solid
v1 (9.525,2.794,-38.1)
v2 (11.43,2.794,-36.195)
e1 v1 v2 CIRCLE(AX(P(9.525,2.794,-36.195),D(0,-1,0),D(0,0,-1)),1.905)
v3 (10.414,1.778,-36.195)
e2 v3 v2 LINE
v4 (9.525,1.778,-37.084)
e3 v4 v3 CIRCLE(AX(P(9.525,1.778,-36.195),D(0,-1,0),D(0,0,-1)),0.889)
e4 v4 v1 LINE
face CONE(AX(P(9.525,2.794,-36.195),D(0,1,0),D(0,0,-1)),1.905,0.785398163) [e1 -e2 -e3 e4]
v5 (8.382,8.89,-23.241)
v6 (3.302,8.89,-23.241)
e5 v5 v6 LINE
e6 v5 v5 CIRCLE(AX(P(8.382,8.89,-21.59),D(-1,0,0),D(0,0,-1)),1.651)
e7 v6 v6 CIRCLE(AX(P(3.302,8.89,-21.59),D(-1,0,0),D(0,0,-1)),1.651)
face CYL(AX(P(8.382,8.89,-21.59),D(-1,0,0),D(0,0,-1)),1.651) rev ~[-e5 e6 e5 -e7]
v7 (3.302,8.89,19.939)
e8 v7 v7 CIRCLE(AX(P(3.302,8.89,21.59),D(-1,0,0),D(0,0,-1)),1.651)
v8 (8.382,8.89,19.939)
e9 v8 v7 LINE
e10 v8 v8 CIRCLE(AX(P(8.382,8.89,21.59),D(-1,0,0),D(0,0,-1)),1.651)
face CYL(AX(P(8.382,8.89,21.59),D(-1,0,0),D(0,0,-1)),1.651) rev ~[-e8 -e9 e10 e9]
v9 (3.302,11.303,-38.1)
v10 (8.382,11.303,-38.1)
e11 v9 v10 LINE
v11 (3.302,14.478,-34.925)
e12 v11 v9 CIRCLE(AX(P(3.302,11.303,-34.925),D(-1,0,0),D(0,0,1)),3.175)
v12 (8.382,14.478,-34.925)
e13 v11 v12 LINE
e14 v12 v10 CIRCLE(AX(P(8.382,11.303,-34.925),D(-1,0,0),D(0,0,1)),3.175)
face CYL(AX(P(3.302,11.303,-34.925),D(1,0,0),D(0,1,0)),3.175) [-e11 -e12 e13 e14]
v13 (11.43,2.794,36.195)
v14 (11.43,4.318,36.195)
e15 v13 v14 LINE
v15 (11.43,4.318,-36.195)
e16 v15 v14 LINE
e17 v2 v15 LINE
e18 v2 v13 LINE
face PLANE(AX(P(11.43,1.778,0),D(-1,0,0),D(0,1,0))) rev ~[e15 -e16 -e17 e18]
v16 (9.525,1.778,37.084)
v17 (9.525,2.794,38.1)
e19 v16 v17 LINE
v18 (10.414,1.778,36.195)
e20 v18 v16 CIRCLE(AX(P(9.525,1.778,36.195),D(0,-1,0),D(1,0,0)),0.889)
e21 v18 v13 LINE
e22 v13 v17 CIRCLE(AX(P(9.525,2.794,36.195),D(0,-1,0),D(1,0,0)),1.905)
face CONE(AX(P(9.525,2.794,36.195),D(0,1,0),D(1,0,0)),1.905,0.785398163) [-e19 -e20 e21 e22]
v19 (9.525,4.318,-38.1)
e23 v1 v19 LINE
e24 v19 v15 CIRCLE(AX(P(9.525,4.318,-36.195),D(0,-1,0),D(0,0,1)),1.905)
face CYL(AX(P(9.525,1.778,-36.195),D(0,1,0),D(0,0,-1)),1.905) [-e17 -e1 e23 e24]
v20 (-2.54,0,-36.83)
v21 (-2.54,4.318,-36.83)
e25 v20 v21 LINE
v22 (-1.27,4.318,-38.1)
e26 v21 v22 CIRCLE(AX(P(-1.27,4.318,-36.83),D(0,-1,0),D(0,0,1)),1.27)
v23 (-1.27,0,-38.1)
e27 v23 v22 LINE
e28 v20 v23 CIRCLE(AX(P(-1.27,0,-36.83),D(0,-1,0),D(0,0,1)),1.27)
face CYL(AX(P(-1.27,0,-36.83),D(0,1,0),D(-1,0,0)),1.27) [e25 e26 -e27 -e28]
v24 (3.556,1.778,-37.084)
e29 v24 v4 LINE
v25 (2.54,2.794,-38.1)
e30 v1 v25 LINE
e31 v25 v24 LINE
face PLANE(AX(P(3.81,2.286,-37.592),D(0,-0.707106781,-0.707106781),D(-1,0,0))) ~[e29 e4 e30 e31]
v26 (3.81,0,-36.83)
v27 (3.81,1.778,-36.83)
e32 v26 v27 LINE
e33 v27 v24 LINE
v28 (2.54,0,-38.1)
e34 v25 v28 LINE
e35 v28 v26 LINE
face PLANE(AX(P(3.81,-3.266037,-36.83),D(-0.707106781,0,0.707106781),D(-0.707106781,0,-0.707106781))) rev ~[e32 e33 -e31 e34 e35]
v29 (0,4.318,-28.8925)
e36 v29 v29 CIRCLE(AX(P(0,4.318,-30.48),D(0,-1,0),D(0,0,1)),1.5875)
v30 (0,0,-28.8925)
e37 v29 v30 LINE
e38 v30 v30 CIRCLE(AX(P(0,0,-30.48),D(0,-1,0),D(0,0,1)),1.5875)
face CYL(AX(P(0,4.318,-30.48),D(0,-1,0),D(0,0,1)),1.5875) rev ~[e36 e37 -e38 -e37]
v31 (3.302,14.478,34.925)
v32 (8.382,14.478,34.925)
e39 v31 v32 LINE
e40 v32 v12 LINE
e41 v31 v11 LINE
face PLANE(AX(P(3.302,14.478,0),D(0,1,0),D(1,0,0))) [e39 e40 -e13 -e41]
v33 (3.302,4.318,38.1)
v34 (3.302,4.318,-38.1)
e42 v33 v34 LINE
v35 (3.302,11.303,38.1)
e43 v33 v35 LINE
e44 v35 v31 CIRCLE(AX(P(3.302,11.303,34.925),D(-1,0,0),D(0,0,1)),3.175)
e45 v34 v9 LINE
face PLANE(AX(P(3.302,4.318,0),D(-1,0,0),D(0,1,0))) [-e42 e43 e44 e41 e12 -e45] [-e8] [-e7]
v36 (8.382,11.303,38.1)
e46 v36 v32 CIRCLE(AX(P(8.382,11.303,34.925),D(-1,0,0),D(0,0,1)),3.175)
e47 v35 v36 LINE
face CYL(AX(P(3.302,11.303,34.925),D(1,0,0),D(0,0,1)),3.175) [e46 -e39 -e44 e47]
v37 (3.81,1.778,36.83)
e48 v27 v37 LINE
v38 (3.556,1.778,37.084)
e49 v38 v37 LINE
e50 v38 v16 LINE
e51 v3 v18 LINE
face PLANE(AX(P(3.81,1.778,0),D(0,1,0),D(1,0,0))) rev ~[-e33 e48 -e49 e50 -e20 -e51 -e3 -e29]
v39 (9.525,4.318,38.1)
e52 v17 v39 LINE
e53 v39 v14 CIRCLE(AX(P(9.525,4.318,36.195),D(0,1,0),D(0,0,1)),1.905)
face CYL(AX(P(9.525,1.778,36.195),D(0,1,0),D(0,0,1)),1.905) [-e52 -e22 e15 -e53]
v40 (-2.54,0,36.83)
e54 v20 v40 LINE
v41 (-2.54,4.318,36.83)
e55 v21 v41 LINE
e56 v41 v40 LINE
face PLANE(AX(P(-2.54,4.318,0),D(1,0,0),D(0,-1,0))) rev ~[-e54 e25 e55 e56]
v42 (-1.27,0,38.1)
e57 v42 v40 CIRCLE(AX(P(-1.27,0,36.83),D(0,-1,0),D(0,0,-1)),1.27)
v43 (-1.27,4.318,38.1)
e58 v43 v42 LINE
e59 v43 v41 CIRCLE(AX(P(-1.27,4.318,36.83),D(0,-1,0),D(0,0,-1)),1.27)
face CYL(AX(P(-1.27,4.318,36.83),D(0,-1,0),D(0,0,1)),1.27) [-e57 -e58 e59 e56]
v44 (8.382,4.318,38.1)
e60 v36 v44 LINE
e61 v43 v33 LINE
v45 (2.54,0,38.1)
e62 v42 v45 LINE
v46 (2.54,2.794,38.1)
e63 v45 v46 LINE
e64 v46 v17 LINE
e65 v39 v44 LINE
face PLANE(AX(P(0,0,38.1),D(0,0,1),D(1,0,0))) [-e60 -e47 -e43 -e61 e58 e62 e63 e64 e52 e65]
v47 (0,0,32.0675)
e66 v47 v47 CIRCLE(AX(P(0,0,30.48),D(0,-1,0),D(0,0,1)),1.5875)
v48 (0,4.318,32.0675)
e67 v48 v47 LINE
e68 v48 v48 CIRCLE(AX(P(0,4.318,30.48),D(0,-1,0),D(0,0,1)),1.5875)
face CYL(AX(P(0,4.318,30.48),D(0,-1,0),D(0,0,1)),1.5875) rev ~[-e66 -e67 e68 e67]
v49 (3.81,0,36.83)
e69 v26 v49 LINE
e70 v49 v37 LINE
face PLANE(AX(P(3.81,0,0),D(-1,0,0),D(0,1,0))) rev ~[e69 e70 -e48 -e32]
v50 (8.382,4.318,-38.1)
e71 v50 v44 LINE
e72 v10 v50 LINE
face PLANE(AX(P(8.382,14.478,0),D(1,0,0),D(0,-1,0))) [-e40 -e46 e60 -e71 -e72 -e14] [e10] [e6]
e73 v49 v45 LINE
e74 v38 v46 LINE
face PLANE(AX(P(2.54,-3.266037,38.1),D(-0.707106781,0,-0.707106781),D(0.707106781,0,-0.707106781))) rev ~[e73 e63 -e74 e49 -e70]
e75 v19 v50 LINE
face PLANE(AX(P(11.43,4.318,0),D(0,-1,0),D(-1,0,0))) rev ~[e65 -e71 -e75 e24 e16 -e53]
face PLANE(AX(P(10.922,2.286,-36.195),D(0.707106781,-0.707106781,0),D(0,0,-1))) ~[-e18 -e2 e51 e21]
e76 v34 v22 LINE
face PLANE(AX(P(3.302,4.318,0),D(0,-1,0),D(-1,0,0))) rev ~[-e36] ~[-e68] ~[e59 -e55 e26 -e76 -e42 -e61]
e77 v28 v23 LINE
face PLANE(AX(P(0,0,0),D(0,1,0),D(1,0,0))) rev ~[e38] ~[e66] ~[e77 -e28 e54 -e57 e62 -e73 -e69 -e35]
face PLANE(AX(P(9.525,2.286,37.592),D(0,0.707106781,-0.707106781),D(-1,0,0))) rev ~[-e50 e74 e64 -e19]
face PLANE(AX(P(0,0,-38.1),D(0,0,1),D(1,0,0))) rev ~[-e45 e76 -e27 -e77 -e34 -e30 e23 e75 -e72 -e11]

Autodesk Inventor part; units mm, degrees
ref_plane "YZ Plane" through (0, 0, 0) normal (1, 0, 0) x (0, 1, 0)
ref_plane "XZ Plane" through (0, 0, 0) normal (0, 1, 0) x (-1, 0, 0)
ref_plane "XY Plane" through (0, 0, 0) normal (0, 0, 1) x (1, 0, 0)
sketch "Sketch1" plane through (0, 0, 0) normal (0, 0, 1) x (1, 0, 0)
  line L0 (0, 17.3736) -> (0, -2.8956) projected
  line L1 (-5.334, 0) -> (14.224, 0) projected
  line L2 (3.81, 1.778) -> (-2.54, 1.778)
  line L3 (-2.54, 1.778) -> (-2.54, 0)
  line L4 (-2.54, 0) -> (3.81, 0)
  line L5 (3.81, 0) -> (3.81, 1.778)
  line L6 (3.81, 1.778) -> (11.43, 1.778)
  line L7 (11.43, 1.778) -> (11.43, 4.318)
  line L8 (11.43, 4.318) -> (-2.54, 4.318)
  line L9 (-2.54, 4.318) -> (-2.54, 1.778)
  line L10 (8.382, 4.318) -> (3.302, 4.318)
  line L11 (3.302, 4.318) -> (3.302, 14.478)
  line L12 (3.302, 14.478) -> (8.382, 14.478)
  line L13 (8.382, 14.478) -> (8.382, 4.318)
  point P0 (0, 0)
  point P1 (0, 0.635)
  dimension "d1" = 2.54
  dimension "d2" = 1.778
  dimension "d25" = 2.54
  dimension "d26" = 10.16
  dimension "d27" = 5.08
  dimension "d49" = 3.302
  dimension "d50" = 2.54
  dimension "d51" = 11.43
  dimension "d52" = 3.81
extrude "Extrusion1" add sketch "Sketch1" along normal mid plane 76.2
sketch "Sketch2" plane through (-2.54, 4.318, 38.1) normal (0, 1, 0) x (1, 0, 0)
  line L0 (13.97, 76.2) -> (13.97, 0) projected
  line L1 (0, 76.2) -> (13.97, 76.2) projected
  line L2 (13.97, 0) -> (0, 0) projected
  line L3 (0, 76.2) -> (0, 0)
  line L4 (16.764, 38.1) -> (-2.794, 38.1) projected
  point P0 (2.54, 38.1)
  point P1 (2.54, 68.58)
  point P2 (2.54, 38.1)
  point P3 (2.54, 7.62)
  dimension "d6" = 30.48
  dimension "d7" = 30.48
  dimension "d48" = 2.54
hole "Hole1" at (0, 4.318, -30.48) at (0, 4.318, 30.48) direction (0, -1, 0) diameter 3.175 end through all
fillet "Fillet4" radius 1.905 2 edges at (11.43, 3.048, 38.1) (11.43, 3.048, -38.1)
chamfer "Chamfer4" distance 1.016 angle 45 5 edges at (11.43, 1.778, 0) (10.872, 1.778, 37.542) (6.6675, 1.778, 38.1) (10.872, 1.778, -37.542) (6.6675, 1.778, -38.1)
chamfer "Chamfer1" distance 1.27 angle 45 2 edges at (3.81, 0.889, 38.1) (3.81, 0.889, -38.1)
fillet "Fillet3" radius 1.27 2 edges at (-2.54, 2.159, -38.1) (-2.54, 2.159, 38.1)
fillet "Fillet5" radius 3.175 2 edges at (5.842, 14.478, 38.1) (5.842, 14.478, -38.1)
sketch "Sketch3" plane through (8.382, 4.318, 38.1) normal (1, 0, 0) x (0, 0, -1)
  line L0 (74.93, -4.318) -> (1.27, -4.318) projected
  line L1 (38.1, -7.2136) -> (38.1, 13.0556) projected
  point P0 (38.1, -4.318)
  point P1 (16.51, 4.572)
  point P2 (59.69, 4.572)
  dimension "d38" = 43.18
  dimension "d39" = 21.59
  dimension "d40" = 8.89
hole "Hole2" at (8.382, 8.89, 21.59) at (8.382, 8.89, -21.59) direction (-1, 0, 0) diameter 3.302 end through all
equation "\"d39\" = 0.5 * d38"
properties part number "J007812" material "VERO BLACK"
